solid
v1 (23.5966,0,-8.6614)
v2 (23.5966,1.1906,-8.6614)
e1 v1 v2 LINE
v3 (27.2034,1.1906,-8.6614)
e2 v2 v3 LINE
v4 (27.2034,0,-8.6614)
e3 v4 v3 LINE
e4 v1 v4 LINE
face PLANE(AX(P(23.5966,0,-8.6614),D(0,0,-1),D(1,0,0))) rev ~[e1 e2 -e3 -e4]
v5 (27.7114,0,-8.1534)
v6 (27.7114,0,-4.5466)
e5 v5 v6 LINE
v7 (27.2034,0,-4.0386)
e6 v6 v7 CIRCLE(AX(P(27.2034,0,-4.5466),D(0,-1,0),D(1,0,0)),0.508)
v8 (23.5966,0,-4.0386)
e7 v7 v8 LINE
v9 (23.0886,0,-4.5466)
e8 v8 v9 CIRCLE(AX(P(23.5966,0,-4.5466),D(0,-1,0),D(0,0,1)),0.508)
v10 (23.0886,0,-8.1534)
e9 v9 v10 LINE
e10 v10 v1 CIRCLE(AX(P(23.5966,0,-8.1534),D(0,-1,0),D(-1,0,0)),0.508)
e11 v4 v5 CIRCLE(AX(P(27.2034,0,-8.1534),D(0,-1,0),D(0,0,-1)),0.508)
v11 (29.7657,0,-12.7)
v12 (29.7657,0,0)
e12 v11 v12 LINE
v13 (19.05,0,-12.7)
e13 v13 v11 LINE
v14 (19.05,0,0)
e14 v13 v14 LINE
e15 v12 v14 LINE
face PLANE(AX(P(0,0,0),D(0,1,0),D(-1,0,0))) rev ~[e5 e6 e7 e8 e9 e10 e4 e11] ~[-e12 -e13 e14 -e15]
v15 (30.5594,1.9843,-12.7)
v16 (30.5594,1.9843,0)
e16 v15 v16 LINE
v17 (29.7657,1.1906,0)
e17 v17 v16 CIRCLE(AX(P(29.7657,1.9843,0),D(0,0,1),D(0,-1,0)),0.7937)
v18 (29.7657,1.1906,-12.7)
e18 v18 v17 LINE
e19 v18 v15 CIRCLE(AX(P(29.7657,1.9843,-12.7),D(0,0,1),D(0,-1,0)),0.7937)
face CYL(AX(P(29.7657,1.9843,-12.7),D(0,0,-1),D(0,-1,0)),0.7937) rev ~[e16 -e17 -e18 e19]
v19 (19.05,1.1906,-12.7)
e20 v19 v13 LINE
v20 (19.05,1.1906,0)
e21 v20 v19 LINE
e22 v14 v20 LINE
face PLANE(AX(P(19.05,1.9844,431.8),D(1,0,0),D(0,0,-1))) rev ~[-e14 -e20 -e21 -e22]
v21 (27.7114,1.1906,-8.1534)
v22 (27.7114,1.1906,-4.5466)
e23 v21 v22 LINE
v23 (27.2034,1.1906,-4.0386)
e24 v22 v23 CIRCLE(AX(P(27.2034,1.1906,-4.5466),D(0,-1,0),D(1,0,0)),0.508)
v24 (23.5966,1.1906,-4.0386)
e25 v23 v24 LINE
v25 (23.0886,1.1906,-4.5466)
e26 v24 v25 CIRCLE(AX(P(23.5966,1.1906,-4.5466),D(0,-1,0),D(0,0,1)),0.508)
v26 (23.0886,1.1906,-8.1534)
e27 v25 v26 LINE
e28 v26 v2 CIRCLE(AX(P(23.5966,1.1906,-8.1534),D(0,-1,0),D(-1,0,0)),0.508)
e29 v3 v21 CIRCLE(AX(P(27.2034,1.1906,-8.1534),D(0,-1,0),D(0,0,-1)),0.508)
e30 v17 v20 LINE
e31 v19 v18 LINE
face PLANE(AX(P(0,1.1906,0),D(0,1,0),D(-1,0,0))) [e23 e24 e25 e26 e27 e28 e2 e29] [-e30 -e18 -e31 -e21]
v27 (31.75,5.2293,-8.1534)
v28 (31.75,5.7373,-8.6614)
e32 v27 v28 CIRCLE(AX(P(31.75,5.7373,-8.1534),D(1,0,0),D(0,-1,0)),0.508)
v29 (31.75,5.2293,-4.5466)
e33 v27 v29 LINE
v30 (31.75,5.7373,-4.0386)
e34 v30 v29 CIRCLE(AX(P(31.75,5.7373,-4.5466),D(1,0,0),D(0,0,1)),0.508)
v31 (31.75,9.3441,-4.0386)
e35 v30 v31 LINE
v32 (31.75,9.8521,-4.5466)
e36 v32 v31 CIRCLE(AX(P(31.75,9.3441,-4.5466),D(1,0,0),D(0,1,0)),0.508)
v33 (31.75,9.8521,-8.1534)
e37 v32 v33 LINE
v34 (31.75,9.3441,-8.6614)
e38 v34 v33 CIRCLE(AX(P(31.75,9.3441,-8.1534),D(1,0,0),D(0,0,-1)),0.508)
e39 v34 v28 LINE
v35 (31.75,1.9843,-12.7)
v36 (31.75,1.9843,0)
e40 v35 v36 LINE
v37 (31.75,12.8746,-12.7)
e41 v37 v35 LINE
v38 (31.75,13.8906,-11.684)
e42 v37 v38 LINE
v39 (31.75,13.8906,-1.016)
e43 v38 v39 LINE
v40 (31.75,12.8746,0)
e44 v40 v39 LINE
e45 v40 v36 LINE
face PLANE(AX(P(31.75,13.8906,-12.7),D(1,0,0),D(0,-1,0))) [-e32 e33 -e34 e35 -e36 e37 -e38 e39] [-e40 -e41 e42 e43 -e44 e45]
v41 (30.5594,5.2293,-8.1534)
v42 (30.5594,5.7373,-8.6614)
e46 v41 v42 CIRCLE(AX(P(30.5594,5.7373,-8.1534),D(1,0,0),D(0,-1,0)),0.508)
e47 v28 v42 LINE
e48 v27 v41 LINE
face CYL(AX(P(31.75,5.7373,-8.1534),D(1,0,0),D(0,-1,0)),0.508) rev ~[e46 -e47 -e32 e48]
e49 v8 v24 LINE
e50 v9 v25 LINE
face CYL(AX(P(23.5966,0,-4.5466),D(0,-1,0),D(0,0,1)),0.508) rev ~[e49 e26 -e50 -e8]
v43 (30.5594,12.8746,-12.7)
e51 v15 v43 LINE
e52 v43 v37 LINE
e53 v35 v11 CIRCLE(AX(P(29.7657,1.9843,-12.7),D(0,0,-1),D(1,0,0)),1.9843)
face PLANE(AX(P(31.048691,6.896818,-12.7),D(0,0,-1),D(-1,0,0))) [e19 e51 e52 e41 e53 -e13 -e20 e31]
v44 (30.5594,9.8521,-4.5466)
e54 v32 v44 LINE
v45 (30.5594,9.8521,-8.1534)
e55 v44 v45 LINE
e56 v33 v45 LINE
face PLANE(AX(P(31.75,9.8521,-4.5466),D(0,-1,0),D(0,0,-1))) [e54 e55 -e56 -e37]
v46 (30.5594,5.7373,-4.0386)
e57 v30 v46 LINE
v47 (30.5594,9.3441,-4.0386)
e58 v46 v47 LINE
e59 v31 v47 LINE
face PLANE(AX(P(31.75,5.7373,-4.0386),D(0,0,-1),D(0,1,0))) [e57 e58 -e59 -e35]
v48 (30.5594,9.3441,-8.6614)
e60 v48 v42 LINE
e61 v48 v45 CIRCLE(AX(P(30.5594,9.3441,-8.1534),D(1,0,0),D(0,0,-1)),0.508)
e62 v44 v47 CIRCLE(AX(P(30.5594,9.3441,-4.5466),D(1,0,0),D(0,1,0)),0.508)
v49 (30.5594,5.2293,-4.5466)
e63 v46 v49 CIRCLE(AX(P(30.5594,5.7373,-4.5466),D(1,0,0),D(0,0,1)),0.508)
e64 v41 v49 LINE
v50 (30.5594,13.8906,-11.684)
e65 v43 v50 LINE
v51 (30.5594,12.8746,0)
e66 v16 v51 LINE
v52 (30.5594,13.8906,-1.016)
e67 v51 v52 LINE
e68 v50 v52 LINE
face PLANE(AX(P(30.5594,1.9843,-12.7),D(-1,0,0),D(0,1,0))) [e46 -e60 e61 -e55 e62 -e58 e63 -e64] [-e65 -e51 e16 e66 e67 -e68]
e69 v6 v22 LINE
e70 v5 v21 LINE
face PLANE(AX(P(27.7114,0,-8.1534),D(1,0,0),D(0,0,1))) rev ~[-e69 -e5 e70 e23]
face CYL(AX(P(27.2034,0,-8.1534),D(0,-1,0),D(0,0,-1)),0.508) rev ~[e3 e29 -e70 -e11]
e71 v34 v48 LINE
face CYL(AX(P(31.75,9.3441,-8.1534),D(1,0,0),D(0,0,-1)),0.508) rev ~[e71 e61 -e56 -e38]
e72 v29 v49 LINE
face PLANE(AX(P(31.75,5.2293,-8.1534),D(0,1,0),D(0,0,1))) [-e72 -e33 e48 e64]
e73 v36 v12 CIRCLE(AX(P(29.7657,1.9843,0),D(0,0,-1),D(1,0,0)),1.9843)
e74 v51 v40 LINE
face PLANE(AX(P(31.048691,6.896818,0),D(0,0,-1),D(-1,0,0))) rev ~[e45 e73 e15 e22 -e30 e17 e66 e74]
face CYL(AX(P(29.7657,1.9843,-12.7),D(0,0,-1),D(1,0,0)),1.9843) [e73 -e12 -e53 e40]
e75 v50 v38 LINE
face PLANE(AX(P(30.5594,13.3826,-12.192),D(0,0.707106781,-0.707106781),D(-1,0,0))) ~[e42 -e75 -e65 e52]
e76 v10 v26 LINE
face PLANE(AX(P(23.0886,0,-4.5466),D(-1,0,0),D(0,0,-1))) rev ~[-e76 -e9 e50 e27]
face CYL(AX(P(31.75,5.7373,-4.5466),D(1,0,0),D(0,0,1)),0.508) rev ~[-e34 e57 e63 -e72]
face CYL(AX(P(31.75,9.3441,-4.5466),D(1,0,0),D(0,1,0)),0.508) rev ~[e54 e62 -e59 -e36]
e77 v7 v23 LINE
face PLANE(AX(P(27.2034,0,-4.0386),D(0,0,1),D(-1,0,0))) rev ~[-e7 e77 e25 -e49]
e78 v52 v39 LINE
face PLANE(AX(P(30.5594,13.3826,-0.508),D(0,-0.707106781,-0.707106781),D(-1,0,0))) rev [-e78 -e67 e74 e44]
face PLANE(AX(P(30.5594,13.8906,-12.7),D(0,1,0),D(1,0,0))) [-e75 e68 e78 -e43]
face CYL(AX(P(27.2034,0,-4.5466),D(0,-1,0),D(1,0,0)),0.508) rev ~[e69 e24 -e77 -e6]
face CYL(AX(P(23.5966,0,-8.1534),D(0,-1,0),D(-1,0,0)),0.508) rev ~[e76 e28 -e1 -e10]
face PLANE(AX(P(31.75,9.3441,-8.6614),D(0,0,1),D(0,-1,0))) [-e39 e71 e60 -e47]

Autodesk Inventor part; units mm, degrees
ref_plane "YZ Plane" through (0, 0, 0) normal (1, 0, 0) x (0, 1, 0)
ref_plane "XZ Plane" through (0, 0, 0) normal (0, 1, 0) x (-1, 0, 0)
sketch "Sketch1" plane through (0, 0, 0) normal (0, 1, 0) x (-1, 0, 0)
  line L0 (-31.75, 0) -> (31.75, 0)
  line L1 (31.75, 0) -> (31.75, -12.7)
  line L2 (31.75, -12.7) -> (-31.75, -12.7)
  line L3 (-31.75, -12.7) -> (-31.75, 0)
  line L4 (31.75, 0) -> (-31.75, -12.7) construction
  point P0 (0, 0)
  point P1 (0, 0)
  dimension "d0" = 63.5
  dimension "d1" = 12.7
extrude "Plate1" add sketch "Sketch1" along normal blind 1.1906
sketch "Sketch2" plane through (30.5594, 0, -12.7) normal (1, 0, 0) x (0, 1, 0)
  line L0 (0, 12.7) -> (0, 0)
  line L1 (0, 0) -> (13.8906, 0)
  line L2 (13.8906, 0) -> (13.8906, 12.7)
  line L3 (13.8906, 12.7) -> (0, 12.7)
edge flange "Flanges" height 12.7 angle 90 thickness 1.1906 bend radius 0.7937 thickness toward (1, 0, 0) relief tear relief width 1.1906 relief depth 0.5953 corner gap 1.1906 corner form 0 edges at (31.75, 1.1906, -6.35) (-31.75, 1.1906, -6.35) wall of the first edge with corners at (30.5594, 0, 0) (30.5594, 0, -12.7) (30.5594, 13.8906, -12.7) (30.5594, 13.8906, 0)
bend "Bend1"
corner "Corner1"
sketch "Sketch3" plane through (31.75, 1.9844, -12.7) normal (1, 0, 0) x (0, 0, -1)
  line L0 (-8.1534, 7.8677) -> (-4.5466, 7.8677)
  line L1 (-4.0386, 7.3597) -> (-4.0386, 3.7529)
  line L2 (-4.5466, 3.2449) -> (-8.1534, 3.2449)
  line L3 (-8.6614, 3.7529) -> (-8.6614, 7.3597)
  arc A0 (-8.1534, 7.8677) -> (-8.6614, 7.3597) centre (-8.1534, 7.3597) ccw
  arc A1 (-4.0386, 7.3597) -> (-4.5466, 7.8677) centre (-4.5466, 7.3597) ccw
  arc A2 (-4.5466, 3.2449) -> (-4.0386, 3.7529) centre (-4.5466, 3.7529) ccw
  arc A3 (-8.6614, 3.7529) -> (-8.1534, 3.2449) centre (-8.1534, 3.7529) ccw
  line L4 (-12.7, 0) -> (-12.7, 11.9063) construction
  line L5 (-12.7, 11.9063) -> (0, 11.9063) construction
  line L6 (-8.1534, 7.3597) -> (-4.5466, 3.7529) construction
  point P0 (-12.7, -1.9844)
  point P1 (-4.0386, 3.2449)
  point P2 (-8.6614, 3.2449)
  point P3 (-6.35, 5.5563)
  dimension "d16" = 4.6228
  dimension "d17" = 0.508
  dimension "d20" = 6.35
  dimension "d21" = 6.35
extrude "Flange Stamp" cut sketch "Sketch3" against normal blind 1.1906
sketch "Sketch7" plane through (31.75, 1.9844, 0) normal (1, 0, 0) x (0, 0, -1)
  arc A0 (4.5466, 7.8677) -> (4.0386, 7.3597) centre (4.5466, 7.3597) ccw construction
  arc A1 (8.1534, 3.2449) -> (8.6614, 3.7529) centre (8.1534, 3.7529) ccw construction
  circle A2 centre (6.35, 5.5563) radius 2.1844
  line L0 (4.5466, 7.3597) -> (8.1534, 3.7529) construction
  point P0 (0, -1.9844)
  dimension "d46" = 4.3688
surface extrude "Flange Circle" sketch "Sketch7" against normal up to surface (1.1906 mm away) shown yes curves A2
ref_plane "Flange Pattern Plane" through (31.75, 7.5406, -4.5466) normal (0, 1, 0) x (1, 0, 0)
feature "Flange Pattern" [suppressed]
sketch "Sketch8" plane through (0, 0, 0) normal (0, -1, 0) x (1, 0, 0)
  line L0 (29.7656, 0) -> (-29.7656, 0) construction
  line L1 (27.2034, -4.0386) -> (23.5966, -4.0386)
  line L2 (23.0886, -4.5466) -> (23.0886, -8.1534)
  line L3 (23.5966, -8.6614) -> (27.2034, -8.6614)
  line L4 (27.7114, -8.1534) -> (27.7114, -4.5466)
  arc A0 (27.7114, -4.5466) -> (27.2034, -4.0386) centre (27.2034, -4.5466) ccw
  arc A1 (27.2034, -8.6614) -> (27.7114, -8.1534) centre (27.2034, -8.1534) ccw
  arc A2 (23.0886, -8.1534) -> (23.5966, -8.6614) centre (23.5966, -8.1534) ccw
  arc A3 (23.5966, -4.0386) -> (23.0886, -4.5466) centre (23.5966, -4.5466) ccw
  line L5 (27.2034, -4.5466) -> (23.5966, -8.1534) construction
  line L6 (31.75, 0) -> (31.75, -12.7) construction
  point P0 (0, 0)
  point P1 (23.0886, -8.6614)
  point P2 (27.7114, -8.6614)
  point P3 (25.4, -6.35)
  dimension "d49" = 4.6228
  dimension "d50" = 0.508
  dimension "d51" = 6.35
  dimension "d52" = 6.35
extrude "Body Stamp" cut sketch "Sketch8" against normal blind 1.1906
sketch "Sketch9" plane through (0, 0, 0) normal (0, -1, 0) x (1, 0, 0)
  arc A0 (27.7114, -4.5466) -> (27.2034, -4.0386) centre (27.2034, -4.5466) ccw construction
  arc A1 (23.0886, -8.1534) -> (23.5966, -8.6614) centre (23.5966, -8.1534) ccw construction
  line L0 (27.2034, -4.5466) -> (23.5966, -8.1534) construction
  circle A2 centre (25.4, -6.35) radius 2.1844
  point P0 (0, 0)
  dimension "d55" = 4.3688
surface extrude "Body Circle" sketch "Sketch9" against normal up to surface (1.1906 mm away) shown yes curves A2
feature "Body Pattern" [suppressed]
sketch "Arc Length" plane through (30.5594, 1.9844, 0) normal (0, 0, 1) x (1, 0, 0)
  line L0 (0, 0) -> (1.1906, 0) construction
  arc A0 (-0.7938, -0.7938) -> (0, 0) centre (-0.7938, 0) ccw construction
  line L1 (-0.7938, -1.9844) -> (-0.7938, -0.7938) construction
  arc A1 (-0.7938, -1.9844) -> (1.1906, 0) centre (-0.7938, 0) ccw construction
  point P0 (-30.5594, -1.9844)
  dimension "d85" = 3.117
  dimension "d92" = 1.2468
sketch "Sketch13" plane through (31.75, 13.8906, 0) normal (1, 0, 0) x (0, 0, -1)
  line L0 (0, 0) -> (12.7, 0) construction
  line L1 (62.4078, 0) -> (63.4238, -1.016)
  line L2 (63.4238, -1.016) -> (64.4398, 0)
  line L3 (62.4078, 0) -> (64.4398, 0)
  line L4 (12.7, -11.9063) -> (0, -11.9063) construction
  line L5 (63.4238, -10.8903) -> (61.3168, -12.9972)
  line L6 (61.3168, -12.9972) -> (63.4238, -15.1042)
  line L7 (63.4238, -15.1042) -> (65.5308, -12.9972)
  line L8 (65.5308, -12.9972) -> (63.4238, -10.8903)
  line L9 (63.4238, -10.8903) -> (63.4238, -15.1042) construction
  line L10 (63.4238, -1.016) -> (63.4238, -10.8903) construction
  line L11 (0, -11.9063) -> (12.7, -11.9063) construction
  point P0 (0, -13.8906)
  dimension "d86" = 4.2139
  dimension "d88" = 1.016
  dimension "d91" = 1.016
  dimension "d102" = 63.4238
feature "Notch" [suppressed]
mirror "Notch Mirror" [suppressed]
pattern_linear "Notch Pattern" [suppressed]
chamfer "End Chamfer" distance 1.016 angle 45 4 edges at (-31.1547, 13.8906, -12.7) (31.1547, 13.8906, -12.7) (-31.1547, 13.8906, 0) (31.1547, 13.8906, 0)
sketch "Sketch14" plane through (-31.75, 1.9844, 431.8) normal (1, 0, 0) x (0, 0, -1)
  line L0 (431.8, 11.9063) -> (444.5, 11.9063) construction
  line L1 (431.8, 0) -> (431.8, 11.9063) construction
  line L2 (431.8, -1.9844) -> (444.5, -1.9844) construction
  line L3 (431.8, 11.9063) -> (444.5, 11.9063)
  line L4 (444.5, 11.9063) -> (444.5, -1.9844)
  line L5 (444.5, -1.9844) -> (431.8, -1.9844)
  line L6 (431.8, -1.9844) -> (431.8, 11.9063)
  point P0 (382.0521, -1.9844)
extrude "Half Cut" cut sketch "Sketch14" along normal blind 50.8
sketch "Flange Pattern Sketch" plane through (31.75, 7.5406, -4.5466) normal (0, 1, 0) x (1, 0, 0)
  line L0 (0, 3.6068) -> (0, 0) construction
  line L1 (-76.2822, -4.5466) -> (13.1932, -4.5466) construction
  line L2 (0, 0) -> (-1.1906, 0) construction
  point P0 (-31.75, -4.5466)
  point P1 (0, 1.8034)
  point P2 (0, 14.5034)
  point P3 (0, 27.2034)
  point P4 (0, 39.9034)
  point P5 (0, 52.6034)
  point P6 (0, 65.3034)
  point P7 (0, 78.0034)
  point P8 (0, 90.7034)
  point P9 (0, 103.4034)
  point P10 (0, 116.1034)
  point P11 (0, 128.8034)
  point P12 (0, 141.5034)
  point P13 (0, 154.2034)
  point P14 (0, 166.9034)
  point P15 (0, 179.6034)
  point P16 (0, 192.3034)
  point P17 (0, 205.0034)
  point P18 (0, 217.7034)
  point P19 (0, 230.4034)
  point P20 (0, 243.1034)
  point P21 (0, 255.8034)
  point P22 (0, 268.5034)
  point P23 (0, 281.2034)
  point P24 (0, 293.9034)
  point P25 (0, 306.6034)
  point P26 (0, 319.3034)
  point P27 (0, 332.0034)
  point P28 (0, 344.7034)
  point P29 (0, 357.4034)
  point P30 (0, 370.1034)
  point P31 (0, 382.8034)
  point P32 (0, 395.5034)
  point P33 (0, 408.2034)
  point P34 (0, 420.9034)
  point P35 (0, 433.6034)
  dimension "d131" = 12.7
  dimension "d134" = 12.7
sketch "Body Pattern Sketch" plane through (0, 0, 0) normal (0, -1, 0) x (1, 0, 0)
  line L0 (29.7656, 0) -> (-29.7656, 0) construction
  line L1 (31.75, 0) -> (31.75, -12.7) construction
  circle A0 centre (25.4, -6.35) radius 2.1844 construction
  point P0 (0, 0)
  point P1 (25.4, -19.05)
  point P2 (25.4, -31.75)
  point P3 (25.4, -44.45)
  point P4 (25.4, -57.15)
  point P5 (25.4, -69.85)
  point P6 (25.4, -82.55)
  point P7 (25.4, -95.25)
  point P8 (25.4, -107.95)
  point P9 (25.4, -120.65)
  point P10 (25.4, -133.35)
  point P11 (25.4, -146.05)
  point P12 (25.4, -158.75)
  point P13 (25.4, -171.45)
  point P14 (25.4, -184.15)
  point P15 (25.4, -196.85)
  point P16 (25.4, -209.55)
  point P17 (25.4, -222.25)
  point P18 (25.4, -234.95)
  point P19 (25.4, -247.65)
  point P20 (25.4, -260.35)
  point P21 (25.4, -273.05)
  point P22 (25.4, -285.75)
  point P23 (25.4, -298.45)
  point P24 (25.4, -311.15)
  point P25 (25.4, -323.85)
  point P26 (25.4, -336.55)
  point P27 (25.4, -349.25)
  point P28 (25.4, -361.95)
  point P29 (25.4, -374.65)
  point P30 (25.4, -387.35)
  point P31 (25.4, -400.05)
  point P32 (25.4, -412.75)
  point P33 (25.4, -425.45)
  point P34 (25.4, -438.15)
  dimension "d62" = 12.7
  dimension "d65" = 12.7
  dimension "d139" = 12.7
equation "\"d1\" = 12.7 * Length"
equation "\"d18\" = Thickness"
equation "\"d53\" = Thickness"
equation "\"d89\" = Thickness"
equation "\"d2\" = Thickness"
equation "\"d3\" = BendReliefWidth"
equation "\"d4\" = BendReliefDepth"
equation "\"d5\" = MinimumRemnant"
equation "\"d6\" = TransitionRadius"
equation "\"d10\" = CornerReliefSize"
equation "\"d11\" = GapSize"
equation "\"d12\" = JacobiRadiusSize"
equation "\"BendRadius\" = Thickness"
equation "\"BendReliefWidth\" = Thickness"
equation "\"BendReliefDepth\" = 0.5 * Thickness"
equation "\"CornerReliefSize\" = 4 * Thickness"
equation "\"MinimumRemnant\" = 2 * Thickness"
equation "\"TransitionRadius\" = BendRadius"
equation "\"JacobiRadiusSize\" = BendRadius"
equation "\"GapSize\" = Thickness"
equation "\"Length\" = 1"
equation "\"Thickness\" = 1.190625"
properties part number "Alu C 1x3x1x35"
